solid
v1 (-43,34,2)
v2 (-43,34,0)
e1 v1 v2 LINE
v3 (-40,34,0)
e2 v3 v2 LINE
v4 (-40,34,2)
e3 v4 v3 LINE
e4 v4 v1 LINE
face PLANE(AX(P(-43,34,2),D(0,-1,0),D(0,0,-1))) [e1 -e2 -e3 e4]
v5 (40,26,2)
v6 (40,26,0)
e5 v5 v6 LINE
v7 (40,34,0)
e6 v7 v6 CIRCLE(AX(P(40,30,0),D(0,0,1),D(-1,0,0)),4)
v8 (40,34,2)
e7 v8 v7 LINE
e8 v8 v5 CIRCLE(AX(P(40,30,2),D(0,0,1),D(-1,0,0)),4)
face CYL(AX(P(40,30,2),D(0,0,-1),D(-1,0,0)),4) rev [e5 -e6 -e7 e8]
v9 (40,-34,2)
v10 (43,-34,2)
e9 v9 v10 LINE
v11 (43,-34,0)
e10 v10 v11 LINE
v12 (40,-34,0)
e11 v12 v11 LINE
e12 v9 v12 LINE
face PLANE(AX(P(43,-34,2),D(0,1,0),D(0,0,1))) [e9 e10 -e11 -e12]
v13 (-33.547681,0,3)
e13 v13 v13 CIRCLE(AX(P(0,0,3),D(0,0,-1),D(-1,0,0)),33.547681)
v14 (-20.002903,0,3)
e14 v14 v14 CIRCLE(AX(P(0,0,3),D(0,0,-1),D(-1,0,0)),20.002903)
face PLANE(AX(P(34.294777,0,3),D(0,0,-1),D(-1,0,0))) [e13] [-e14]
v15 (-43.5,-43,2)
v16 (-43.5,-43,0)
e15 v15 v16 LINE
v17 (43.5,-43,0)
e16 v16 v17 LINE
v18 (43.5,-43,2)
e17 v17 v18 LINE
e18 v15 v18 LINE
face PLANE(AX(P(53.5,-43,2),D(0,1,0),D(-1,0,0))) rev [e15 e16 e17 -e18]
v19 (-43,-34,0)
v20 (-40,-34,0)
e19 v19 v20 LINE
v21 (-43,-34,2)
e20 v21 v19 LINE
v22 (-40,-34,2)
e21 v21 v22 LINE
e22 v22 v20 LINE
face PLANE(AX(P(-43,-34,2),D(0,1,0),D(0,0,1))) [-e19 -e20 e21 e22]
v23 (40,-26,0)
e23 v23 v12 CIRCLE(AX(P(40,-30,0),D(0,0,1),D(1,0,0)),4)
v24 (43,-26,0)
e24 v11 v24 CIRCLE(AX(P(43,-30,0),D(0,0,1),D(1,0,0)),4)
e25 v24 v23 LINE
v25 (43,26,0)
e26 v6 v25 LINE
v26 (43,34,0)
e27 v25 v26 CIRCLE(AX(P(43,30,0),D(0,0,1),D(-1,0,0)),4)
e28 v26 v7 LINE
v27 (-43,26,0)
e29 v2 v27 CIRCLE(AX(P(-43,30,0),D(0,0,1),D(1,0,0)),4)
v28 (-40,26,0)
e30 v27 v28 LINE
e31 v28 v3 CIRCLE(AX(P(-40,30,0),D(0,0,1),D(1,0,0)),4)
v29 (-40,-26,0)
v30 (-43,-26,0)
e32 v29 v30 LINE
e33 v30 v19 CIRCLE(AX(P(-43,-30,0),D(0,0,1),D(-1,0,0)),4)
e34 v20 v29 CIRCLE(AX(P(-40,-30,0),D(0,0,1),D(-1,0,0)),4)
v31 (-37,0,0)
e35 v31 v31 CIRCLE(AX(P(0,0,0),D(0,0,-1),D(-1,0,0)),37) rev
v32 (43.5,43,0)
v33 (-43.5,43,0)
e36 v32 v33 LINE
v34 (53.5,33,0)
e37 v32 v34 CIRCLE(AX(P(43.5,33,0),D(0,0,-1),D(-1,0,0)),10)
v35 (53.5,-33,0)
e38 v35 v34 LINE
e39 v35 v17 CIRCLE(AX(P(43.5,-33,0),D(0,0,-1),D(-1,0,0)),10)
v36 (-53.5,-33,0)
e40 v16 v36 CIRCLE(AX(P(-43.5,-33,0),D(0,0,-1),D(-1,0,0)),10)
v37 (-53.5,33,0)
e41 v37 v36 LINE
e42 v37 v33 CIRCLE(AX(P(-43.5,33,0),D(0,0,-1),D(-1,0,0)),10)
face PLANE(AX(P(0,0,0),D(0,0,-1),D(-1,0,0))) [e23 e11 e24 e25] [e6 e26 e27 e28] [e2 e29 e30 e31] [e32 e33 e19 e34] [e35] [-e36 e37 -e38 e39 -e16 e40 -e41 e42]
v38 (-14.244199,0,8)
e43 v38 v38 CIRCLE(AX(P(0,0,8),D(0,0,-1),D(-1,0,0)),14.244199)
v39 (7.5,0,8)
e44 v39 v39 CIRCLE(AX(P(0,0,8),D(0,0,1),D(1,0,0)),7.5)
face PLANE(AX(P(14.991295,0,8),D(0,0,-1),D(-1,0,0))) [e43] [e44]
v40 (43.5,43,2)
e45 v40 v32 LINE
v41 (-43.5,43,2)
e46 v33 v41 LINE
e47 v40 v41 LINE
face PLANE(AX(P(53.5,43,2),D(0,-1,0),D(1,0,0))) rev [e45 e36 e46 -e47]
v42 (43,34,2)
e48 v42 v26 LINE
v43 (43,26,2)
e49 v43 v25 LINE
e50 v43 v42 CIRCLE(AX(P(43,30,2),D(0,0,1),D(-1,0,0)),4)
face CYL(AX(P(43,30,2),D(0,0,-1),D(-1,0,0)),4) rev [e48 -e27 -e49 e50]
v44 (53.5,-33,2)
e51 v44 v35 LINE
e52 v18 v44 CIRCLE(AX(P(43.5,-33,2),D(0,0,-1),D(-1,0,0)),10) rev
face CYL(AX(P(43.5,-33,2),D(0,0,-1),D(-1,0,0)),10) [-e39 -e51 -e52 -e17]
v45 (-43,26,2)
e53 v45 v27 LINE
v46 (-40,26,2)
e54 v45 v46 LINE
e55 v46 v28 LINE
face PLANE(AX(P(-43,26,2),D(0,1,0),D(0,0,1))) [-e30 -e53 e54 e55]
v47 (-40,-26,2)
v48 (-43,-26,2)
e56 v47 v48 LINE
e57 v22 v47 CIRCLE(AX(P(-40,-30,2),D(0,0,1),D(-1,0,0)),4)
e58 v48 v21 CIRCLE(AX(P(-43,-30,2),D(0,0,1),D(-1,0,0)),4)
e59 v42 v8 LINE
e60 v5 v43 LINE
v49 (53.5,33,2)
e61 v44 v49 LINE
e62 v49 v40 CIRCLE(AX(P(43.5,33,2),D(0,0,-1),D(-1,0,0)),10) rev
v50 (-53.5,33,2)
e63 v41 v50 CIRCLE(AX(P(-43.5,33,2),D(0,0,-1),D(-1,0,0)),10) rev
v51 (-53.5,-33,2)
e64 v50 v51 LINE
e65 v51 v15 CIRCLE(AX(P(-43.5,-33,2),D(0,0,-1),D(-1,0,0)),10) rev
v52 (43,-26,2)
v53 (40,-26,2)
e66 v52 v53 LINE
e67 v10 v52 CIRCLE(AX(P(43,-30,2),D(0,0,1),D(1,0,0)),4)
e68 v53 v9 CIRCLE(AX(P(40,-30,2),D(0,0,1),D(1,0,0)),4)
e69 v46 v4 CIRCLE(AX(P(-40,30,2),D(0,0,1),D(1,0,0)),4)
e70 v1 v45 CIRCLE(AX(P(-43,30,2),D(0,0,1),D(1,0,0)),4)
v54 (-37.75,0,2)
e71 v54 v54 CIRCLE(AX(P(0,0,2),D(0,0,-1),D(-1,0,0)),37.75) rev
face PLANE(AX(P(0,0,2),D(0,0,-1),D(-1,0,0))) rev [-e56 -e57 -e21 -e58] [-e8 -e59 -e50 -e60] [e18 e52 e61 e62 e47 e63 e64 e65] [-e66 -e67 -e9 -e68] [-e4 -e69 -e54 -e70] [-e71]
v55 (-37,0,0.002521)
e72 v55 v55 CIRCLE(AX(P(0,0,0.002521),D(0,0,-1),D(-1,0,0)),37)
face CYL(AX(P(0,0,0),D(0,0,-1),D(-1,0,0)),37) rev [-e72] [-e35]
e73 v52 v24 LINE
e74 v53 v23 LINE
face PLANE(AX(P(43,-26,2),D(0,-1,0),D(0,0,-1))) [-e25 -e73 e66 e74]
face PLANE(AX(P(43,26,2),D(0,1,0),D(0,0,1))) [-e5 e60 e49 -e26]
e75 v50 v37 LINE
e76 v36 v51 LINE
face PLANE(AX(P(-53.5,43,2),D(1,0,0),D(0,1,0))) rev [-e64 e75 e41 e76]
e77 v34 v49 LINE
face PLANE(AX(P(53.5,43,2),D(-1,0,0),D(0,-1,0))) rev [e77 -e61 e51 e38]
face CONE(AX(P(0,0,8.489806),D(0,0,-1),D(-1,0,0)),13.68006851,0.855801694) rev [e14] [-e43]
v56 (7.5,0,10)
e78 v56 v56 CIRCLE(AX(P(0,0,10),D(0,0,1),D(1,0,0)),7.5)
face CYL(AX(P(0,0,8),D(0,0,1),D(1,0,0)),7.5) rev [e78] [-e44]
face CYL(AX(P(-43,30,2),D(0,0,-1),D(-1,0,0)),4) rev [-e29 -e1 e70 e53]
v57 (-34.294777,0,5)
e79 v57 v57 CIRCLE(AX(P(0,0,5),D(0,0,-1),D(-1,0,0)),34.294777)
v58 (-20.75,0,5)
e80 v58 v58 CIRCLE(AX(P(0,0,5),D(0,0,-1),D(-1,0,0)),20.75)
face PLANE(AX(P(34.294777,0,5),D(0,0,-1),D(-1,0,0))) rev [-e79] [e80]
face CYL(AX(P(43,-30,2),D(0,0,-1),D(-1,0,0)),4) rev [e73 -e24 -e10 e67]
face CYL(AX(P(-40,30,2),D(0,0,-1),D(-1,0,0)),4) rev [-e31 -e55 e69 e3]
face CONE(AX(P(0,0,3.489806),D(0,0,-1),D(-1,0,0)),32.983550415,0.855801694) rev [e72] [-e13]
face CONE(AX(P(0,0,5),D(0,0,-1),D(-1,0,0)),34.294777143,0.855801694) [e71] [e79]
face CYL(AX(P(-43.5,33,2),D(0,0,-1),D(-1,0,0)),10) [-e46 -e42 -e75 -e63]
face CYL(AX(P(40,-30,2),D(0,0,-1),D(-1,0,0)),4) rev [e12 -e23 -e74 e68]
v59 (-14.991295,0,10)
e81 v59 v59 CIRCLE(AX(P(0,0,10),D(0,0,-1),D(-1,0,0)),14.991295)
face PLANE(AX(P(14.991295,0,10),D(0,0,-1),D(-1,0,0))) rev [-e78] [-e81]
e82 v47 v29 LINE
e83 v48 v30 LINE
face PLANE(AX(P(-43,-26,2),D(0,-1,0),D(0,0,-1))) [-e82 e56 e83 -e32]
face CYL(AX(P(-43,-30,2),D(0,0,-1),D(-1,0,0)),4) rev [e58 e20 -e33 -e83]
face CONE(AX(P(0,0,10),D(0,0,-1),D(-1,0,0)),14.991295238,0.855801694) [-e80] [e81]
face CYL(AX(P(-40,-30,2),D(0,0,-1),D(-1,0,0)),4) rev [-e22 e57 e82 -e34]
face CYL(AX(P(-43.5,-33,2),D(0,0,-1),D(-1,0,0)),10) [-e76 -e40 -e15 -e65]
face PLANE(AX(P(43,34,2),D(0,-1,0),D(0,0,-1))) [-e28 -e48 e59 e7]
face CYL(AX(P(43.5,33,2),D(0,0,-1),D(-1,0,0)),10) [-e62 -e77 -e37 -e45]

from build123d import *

# Parameters (mm, degrees)
SKETCH1_W           = 107
SKETCH1_H           = 86
BOSS_EXTRUDE1_DEPTH = 2
FILLET1_R           = 10
SKETCH5_R           = 7.5
CUT_EXTRUDE1_DEPTH  = 2


# Read off the part's stored shape, not the designer's step: Shell2
with BuildPart() as part:
    # Sketch1 → Boss-Extrude1 (new body)
    with BuildSketch(Plane.XY):
        Rectangle(SKETCH1_W, SKETCH1_H)
        with BuildLine():
            Line((-43, 34), (-40, 34))
            ThreePointArc((-40, 34), (-36, 30), (-40, 26))
            Line((-40, 26), (-43, 26))
            ThreePointArc((-43, 26), (-47, 30), (-43, 34))
        make_face(mode=Mode.SUBTRACT)
        with BuildLine():
            Line((43, 34), (40, 34))
            ThreePointArc((40, 34), (36, 30), (40, 26))
            Line((40, 26), (43, 26))
            ThreePointArc((43, 26), (47, 30), (43, 34))
        make_face(mode=Mode.SUBTRACT)
        with BuildLine():
            Line((43, -34), (40, -34))
            ThreePointArc((40, -34), (36, -30), (40, -26))
            Line((40, -26), (43, -26))
            ThreePointArc((43, -26), (47, -30), (43, -34))
        make_face(mode=Mode.SUBTRACT)
        with BuildLine():
            Line((-43, -34), (-40, -34))
            ThreePointArc((-40, -34), (-36, -30), (-40, -26))
            Line((-40, -26), (-43, -26))
            ThreePointArc((-43, -26), (-47, -30), (-43, -34))
        make_face(mode=Mode.SUBTRACT)
    extrude(amount=BOSS_EXTRUDE1_DEPTH)

    # Fillet1
    fillet1_edges = [part.edges().sort_by_distance(p)[0] for p in [
        (-53.5, 43, 1),
        (53.5, 43, 1),
        (53.5, -43, 1),
        (-53.5, -43, 1),
    ]]
    fillet(fillet1_edges, radius=FILLET1_R)

    # Sketch3 → Revolve1 (revolve)
    with BuildSketch(Plane(origin=(0, 0, 0), x_dir=(1, 0, 0), z_dir=(0, 1, 0)), mode=Mode.PRIVATE) as revolve1_sk:
        Polygon((37.75, -2), (34.294777143, -5), (20.75, -5), (14.991295238, -10), (0, -10), (0, -2), align=None)
    revolve(revolve1_sk.sketch.rotate(Axis((0, 0, 0), (0, 0, 1)), 180), axis=Axis((0, 0, 0), (0, 0, 1)))

    # Shell2 outline → Shell2 (revolve, cut)
    with BuildSketch(Plane.XZ):
        Polygon((37, 0), (37, 0.002520926), (33.547680597, 3), (20.002903454, 3), (14.244198692, 8), (0, 8), (0, 0), align=None)
    revolve(axis=Axis((0, 0, 0), (0, 0, 1)), mode=Mode.SUBTRACT)

    # Sketch5 → Cut-Extrude1 (cut)
    with BuildSketch(Plane.XY.offset(10)):
        Circle(SKETCH5_R)
    extrude(amount=-CUT_EXTRUDE1_DEPTH, mode=Mode.SUBTRACT)


solid = part.part
